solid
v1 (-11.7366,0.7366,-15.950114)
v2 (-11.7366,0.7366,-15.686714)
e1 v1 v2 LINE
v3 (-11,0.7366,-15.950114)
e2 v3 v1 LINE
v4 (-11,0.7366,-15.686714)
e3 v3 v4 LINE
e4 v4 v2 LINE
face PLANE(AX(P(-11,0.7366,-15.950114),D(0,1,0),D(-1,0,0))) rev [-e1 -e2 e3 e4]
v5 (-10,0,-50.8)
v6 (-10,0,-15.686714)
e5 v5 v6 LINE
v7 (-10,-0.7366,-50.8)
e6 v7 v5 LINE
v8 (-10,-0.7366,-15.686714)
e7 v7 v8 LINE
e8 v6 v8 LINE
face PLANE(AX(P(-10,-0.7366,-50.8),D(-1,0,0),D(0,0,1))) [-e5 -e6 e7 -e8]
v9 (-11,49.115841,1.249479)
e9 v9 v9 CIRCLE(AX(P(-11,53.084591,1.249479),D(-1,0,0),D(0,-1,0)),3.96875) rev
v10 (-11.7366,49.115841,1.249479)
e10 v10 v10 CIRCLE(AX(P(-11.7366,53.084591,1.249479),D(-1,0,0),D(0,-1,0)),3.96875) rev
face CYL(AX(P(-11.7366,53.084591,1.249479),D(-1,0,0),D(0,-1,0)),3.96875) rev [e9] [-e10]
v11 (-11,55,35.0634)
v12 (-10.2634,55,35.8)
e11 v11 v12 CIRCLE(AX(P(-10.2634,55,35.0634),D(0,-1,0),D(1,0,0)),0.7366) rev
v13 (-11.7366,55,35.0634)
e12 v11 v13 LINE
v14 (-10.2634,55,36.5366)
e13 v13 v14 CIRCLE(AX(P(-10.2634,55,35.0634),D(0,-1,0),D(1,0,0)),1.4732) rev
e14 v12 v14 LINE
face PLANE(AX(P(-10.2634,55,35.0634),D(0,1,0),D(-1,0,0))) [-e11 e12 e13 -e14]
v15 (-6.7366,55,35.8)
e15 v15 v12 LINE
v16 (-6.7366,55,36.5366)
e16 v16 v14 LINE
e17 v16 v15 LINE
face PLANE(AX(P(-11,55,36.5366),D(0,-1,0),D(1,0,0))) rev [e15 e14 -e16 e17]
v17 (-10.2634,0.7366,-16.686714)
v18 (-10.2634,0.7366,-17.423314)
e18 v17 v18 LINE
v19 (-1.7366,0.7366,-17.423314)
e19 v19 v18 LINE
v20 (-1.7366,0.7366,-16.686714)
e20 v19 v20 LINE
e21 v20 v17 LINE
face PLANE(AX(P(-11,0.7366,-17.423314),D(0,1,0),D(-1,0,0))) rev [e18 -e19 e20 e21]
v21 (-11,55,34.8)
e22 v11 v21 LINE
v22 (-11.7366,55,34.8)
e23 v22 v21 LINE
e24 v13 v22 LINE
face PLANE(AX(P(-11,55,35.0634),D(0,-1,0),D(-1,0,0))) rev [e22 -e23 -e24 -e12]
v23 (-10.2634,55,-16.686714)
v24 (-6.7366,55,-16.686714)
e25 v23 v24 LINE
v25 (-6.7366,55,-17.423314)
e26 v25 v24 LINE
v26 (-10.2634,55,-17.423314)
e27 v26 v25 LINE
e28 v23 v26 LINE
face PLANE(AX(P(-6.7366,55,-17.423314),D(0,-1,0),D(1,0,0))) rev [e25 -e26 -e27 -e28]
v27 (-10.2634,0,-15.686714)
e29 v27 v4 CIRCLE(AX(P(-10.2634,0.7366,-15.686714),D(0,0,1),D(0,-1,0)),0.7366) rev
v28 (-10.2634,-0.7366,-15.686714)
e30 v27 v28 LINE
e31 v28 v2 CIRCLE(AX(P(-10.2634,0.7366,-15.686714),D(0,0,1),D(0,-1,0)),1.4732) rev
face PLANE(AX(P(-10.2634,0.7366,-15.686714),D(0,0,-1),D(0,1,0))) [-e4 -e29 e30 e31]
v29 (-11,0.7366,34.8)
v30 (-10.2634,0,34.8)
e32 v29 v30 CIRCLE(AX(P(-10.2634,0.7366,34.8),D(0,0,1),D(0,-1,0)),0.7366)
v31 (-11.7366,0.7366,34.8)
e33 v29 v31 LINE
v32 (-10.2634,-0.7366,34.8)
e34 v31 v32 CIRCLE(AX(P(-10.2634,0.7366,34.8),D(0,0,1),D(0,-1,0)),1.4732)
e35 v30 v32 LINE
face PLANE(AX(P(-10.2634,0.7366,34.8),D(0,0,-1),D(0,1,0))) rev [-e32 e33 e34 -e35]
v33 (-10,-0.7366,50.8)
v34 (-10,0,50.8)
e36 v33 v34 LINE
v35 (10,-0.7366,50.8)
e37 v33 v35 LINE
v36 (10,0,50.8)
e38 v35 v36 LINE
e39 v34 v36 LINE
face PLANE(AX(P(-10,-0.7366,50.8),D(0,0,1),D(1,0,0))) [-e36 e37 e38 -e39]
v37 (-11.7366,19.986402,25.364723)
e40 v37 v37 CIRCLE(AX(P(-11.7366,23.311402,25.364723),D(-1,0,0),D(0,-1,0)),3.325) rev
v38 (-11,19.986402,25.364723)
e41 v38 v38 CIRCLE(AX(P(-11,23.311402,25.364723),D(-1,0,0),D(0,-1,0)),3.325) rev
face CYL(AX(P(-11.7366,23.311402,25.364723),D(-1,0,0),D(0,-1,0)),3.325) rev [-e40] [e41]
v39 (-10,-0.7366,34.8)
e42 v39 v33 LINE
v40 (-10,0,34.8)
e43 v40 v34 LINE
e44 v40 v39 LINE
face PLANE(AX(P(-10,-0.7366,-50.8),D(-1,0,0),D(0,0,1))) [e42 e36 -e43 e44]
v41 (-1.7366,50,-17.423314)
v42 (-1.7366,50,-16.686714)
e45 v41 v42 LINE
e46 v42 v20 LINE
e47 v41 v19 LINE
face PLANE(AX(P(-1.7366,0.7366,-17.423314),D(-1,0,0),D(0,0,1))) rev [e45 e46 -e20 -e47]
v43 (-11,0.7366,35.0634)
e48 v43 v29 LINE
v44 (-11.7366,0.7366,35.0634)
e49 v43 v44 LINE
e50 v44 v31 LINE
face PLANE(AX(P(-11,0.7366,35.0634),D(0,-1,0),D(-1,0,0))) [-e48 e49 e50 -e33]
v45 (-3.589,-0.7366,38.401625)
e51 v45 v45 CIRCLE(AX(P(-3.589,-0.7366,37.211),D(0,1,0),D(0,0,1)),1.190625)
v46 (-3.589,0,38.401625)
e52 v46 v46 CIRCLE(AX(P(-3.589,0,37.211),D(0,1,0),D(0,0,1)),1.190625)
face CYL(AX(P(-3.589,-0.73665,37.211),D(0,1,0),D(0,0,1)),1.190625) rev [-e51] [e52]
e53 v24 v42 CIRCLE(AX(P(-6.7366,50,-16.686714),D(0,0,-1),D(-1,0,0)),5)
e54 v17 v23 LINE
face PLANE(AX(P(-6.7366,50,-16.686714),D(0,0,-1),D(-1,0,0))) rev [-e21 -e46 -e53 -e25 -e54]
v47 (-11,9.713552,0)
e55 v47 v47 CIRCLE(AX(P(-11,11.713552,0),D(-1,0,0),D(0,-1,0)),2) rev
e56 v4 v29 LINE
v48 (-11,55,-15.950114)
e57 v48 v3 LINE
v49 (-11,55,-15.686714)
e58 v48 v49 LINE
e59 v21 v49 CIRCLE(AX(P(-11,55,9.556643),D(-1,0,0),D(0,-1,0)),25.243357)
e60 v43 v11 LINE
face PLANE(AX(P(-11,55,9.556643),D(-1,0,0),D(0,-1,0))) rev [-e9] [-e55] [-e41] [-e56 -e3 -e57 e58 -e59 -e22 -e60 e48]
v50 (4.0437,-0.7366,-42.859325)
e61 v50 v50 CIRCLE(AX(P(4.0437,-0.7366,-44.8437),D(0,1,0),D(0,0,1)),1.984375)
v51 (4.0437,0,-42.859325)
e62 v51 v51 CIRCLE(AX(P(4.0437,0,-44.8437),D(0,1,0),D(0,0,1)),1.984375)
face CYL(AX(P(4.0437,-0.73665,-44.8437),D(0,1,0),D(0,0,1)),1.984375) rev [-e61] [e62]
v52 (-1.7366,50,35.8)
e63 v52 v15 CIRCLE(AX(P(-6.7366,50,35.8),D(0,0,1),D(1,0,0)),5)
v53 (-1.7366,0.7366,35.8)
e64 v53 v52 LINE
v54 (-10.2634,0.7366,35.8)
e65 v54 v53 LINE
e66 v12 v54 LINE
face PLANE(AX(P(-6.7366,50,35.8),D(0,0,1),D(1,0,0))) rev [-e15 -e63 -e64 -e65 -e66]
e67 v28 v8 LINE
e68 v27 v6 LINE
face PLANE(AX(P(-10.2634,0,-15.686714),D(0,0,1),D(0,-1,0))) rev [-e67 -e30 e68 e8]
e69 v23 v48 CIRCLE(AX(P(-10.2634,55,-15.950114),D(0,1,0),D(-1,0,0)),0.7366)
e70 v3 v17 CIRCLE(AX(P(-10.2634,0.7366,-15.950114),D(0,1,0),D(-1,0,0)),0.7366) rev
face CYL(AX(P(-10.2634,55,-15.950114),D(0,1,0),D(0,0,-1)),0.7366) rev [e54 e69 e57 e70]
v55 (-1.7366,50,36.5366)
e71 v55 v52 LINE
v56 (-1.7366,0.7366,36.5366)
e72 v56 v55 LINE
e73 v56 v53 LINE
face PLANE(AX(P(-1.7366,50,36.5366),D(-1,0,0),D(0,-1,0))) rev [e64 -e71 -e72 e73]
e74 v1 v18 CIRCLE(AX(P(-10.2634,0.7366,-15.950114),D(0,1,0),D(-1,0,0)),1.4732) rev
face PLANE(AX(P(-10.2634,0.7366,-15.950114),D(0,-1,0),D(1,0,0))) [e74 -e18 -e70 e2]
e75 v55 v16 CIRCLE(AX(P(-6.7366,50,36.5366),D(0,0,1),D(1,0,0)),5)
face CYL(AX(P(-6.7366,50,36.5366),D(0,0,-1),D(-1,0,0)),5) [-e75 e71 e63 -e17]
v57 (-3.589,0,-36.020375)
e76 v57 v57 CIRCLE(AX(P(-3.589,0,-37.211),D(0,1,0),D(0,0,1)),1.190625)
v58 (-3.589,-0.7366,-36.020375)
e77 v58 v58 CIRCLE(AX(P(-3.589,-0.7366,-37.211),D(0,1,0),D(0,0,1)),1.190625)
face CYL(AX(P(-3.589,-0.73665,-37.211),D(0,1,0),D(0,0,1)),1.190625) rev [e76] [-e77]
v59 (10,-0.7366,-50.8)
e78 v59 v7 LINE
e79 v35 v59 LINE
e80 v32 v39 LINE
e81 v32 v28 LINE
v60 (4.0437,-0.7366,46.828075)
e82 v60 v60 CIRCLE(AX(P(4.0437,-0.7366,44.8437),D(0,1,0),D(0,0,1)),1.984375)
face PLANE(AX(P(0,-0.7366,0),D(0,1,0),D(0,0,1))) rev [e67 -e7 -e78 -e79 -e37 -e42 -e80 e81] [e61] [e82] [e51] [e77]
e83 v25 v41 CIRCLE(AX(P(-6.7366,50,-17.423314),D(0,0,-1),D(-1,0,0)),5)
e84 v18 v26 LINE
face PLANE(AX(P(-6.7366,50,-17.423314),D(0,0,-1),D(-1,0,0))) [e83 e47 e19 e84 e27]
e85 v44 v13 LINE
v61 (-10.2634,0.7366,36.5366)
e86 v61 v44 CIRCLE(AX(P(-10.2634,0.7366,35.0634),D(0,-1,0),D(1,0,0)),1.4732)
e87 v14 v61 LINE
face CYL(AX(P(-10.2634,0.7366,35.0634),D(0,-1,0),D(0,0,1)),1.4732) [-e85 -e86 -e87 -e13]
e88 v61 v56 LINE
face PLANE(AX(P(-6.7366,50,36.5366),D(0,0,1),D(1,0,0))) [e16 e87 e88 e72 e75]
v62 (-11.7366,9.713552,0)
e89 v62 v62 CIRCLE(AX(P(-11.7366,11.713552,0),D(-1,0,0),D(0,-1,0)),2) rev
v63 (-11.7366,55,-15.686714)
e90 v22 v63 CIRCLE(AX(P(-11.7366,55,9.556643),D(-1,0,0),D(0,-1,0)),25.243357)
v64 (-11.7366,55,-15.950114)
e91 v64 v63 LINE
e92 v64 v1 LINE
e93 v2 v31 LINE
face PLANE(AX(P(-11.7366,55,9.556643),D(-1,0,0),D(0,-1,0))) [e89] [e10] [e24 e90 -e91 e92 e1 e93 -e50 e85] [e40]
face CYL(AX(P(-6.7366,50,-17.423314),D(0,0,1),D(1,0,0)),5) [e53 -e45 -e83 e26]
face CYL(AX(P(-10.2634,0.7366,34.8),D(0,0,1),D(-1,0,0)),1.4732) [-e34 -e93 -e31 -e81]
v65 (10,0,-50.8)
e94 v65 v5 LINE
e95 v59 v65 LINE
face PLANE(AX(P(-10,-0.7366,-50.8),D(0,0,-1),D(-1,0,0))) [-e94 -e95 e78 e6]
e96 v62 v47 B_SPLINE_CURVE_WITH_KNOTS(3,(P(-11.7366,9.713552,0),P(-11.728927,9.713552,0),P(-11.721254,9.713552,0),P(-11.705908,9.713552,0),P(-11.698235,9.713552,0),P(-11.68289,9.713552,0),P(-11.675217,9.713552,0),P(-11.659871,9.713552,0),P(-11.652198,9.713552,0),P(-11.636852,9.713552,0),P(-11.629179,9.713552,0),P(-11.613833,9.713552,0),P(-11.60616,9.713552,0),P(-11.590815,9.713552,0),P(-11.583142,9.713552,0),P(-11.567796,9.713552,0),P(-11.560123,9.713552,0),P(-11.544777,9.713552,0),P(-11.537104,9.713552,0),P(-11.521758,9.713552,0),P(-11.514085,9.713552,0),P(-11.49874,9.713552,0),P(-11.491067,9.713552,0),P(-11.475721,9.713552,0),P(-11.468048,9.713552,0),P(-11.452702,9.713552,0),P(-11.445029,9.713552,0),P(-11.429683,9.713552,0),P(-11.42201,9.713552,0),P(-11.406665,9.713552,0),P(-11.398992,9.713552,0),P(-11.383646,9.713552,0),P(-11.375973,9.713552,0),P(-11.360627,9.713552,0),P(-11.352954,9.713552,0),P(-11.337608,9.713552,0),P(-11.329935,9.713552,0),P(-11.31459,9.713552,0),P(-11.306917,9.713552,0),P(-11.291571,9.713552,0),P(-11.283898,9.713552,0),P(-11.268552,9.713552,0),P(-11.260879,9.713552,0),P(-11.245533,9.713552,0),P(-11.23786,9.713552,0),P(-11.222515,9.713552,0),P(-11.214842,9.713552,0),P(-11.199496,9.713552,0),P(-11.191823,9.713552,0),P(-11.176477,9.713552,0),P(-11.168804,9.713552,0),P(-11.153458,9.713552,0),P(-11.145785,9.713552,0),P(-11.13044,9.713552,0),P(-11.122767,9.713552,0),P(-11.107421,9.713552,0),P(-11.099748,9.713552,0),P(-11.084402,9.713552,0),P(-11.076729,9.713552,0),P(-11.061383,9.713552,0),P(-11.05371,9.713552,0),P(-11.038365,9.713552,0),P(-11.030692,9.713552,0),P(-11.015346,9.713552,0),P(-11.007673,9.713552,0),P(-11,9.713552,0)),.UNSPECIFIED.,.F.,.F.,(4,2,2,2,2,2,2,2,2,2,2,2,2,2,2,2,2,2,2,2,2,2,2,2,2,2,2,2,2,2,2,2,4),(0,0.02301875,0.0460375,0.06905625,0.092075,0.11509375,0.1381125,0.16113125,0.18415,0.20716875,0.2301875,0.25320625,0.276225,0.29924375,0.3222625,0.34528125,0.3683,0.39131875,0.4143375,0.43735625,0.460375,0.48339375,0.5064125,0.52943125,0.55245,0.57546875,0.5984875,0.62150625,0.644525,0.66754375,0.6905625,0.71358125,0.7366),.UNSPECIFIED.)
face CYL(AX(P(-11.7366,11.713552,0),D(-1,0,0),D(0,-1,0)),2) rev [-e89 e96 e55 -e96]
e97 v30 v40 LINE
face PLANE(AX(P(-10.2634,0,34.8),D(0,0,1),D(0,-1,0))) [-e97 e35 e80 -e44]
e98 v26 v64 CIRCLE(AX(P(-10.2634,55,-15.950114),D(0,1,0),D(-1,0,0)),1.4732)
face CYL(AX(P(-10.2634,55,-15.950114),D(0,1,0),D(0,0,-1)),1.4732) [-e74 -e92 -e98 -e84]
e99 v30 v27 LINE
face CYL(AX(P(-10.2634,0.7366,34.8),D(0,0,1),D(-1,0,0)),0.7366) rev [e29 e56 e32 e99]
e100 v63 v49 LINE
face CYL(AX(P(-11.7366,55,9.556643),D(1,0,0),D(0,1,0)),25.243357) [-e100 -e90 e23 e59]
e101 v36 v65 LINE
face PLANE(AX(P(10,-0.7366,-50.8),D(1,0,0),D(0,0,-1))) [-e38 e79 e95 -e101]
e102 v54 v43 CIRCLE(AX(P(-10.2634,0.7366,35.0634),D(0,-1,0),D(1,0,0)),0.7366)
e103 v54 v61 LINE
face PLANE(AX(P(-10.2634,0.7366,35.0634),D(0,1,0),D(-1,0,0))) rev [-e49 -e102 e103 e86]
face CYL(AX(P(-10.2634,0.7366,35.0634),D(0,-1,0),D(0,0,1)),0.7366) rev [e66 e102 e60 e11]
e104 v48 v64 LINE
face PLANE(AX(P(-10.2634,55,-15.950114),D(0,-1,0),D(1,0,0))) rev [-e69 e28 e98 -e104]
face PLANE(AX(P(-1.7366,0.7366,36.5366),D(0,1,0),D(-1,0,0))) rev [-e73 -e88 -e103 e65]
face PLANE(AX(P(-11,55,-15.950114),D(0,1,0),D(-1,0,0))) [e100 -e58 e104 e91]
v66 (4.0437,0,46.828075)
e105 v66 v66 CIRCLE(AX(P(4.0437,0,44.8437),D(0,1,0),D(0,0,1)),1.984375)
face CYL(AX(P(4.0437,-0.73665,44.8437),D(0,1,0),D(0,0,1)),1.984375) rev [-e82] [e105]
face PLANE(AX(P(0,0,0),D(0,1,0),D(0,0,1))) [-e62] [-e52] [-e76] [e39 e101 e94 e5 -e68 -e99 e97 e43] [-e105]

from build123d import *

# Parameters (mm, degrees)
SKETCH1_W                 = 20
SKETCH1_H                 = 101.6
BASE_FLANGE1_DEPTH        = 0.7366
EDGE_FLANGE1_DEPTH        = 50.486713846
EDGE_FLANGE1_START        = 0.7366
EDGE_FLANGE1_FLAT_DEPTH   = 0.7366
CUT_EXTRUDE1_DEPTH        = 245.392554313
CUT_EXTRUDE1_DEPTH_BACK   = 245.392554313
SKETCH9_R                 = 2
CUT_EXTRUDE3_DEPTH        = 248.026355859
CUT_EXTRUDE3_DEPTH_BACK   = 248.026355859
SKETCH11_R                = 3.96875
CUT_EXTRUDE5_DEPTH        = 199.550344579
CUT_EXTRUDE5_DEPTH_BACK   = 199.550344579
SKETCH13_R                = 1.984375
SKETCH13_R_2              = 1.190625
EDGE_FLANGE2_DEPTH        = 54.2634
EDGE_FLANGE2_START        = 0.7366
EDGE_FLANGE2_FLAT_DEPTH   = 0.7366
EDGE_FLANGE2_BEND_DEPTH   = 54.2634
EDGE_FLANGE2_FLAT_2_DEPTH = 0.7366
CUT_EXTRUDE35_DEPTH       = 251.457429571
CUT_EXTRUDE35_DEPTH_BACK  = 251.457429571
SKETCH50_R                = 3.325000001


# Sheet-metal steps are written as plain solids
with BuildPart() as part:
    # Sketch1 → Base-Flange1 (new body)
    with BuildSketch(Plane(origin=(0, 0, 0), x_dir=(1, 0, 0), z_dir=(0, 1, 0))):
        Rectangle(SKETCH1_W, SKETCH1_H)
    extrude(amount=-BASE_FLANGE1_DEPTH)

    # Edge-Flange1 bend section (across the edge) → Edge-Flange1 (add)
    with BuildSketch(Plane(origin=(-11, 0, -15.686713846), x_dir=(1, 0, 0), z_dir=(0, 0, 1))):
        with BuildLine():
            Line((-0.7366, 0.7366), (0, 0.7366))
            ThreePointArc((0, 0.7366), (0.215745145, 0.215745145), (0.7366, 0))
            Line((0.7366, 0), (1, 0))
            Line((1, 0), (1, -0.7366))
            Line((1, -0.7366), (0.7366, -0.7366))
            ThreePointArc((0.7366, -0.7366), (-0.30510971, -0.30510971), (-0.7366, 0.7366))
        make_face()
    extrude(amount=EDGE_FLANGE1_DEPTH)

    # Edge-Flange1 profile (on flange) → Edge-Flange1 flat (add)
    with BuildSketch(Plane.ZY.offset(11).offset(EDGE_FLANGE1_START)):
        with BuildLine():
            ThreePointArc((34.8, 55), (9.556643077, 80.243356923), (-15.686713846, 55))
            Line((-15.686713846, 55), (-15.686713846, 0.7366))
            Line((-15.686713846, 0.7366), (34.8, 0.7366))
            Line((34.8, 0.7366), (34.8, 55))
        make_face()
    extrude(amount=-EDGE_FLANGE1_FLAT_DEPTH)

    # Sketch9 → Cut-Extrude1 (cut, two sides: drawn at the far end of the back side and taken through both)
    with BuildSketch(Plane(origin=(-48.111610167, -124.793980752, 68.826299478), x_dir=(0, 0, -1), z_dir=(1, 0, 0)).offset(-CUT_EXTRUDE1_DEPTH_BACK)):
        with Locations(Location((68.826299478, 136.507533033, 0), (0, 0, 270))):
            Circle(SKETCH9_R)
    extrude(amount=CUT_EXTRUDE1_DEPTH + CUT_EXTRUDE1_DEPTH_BACK, mode=Mode.SUBTRACT)

    # Sketch11 → Cut-Extrude3 (cut, two sides: drawn at the far end of the back side and taken through both)
    with BuildSketch(Plane(origin=(-58.346610167, -124.793980752, 68.826299478), x_dir=(0, 0, -1), z_dir=(1, 0, 0)).offset(-CUT_EXTRUDE3_DEPTH_BACK)):
        with Locations(Location((67.576820433, 177.878571709, 0), (0, 0, 270))):
            Circle(SKETCH11_R)
    extrude(amount=CUT_EXTRUDE3_DEPTH + CUT_EXTRUDE3_DEPTH_BACK, mode=Mode.SUBTRACT)

    # Sketch13 → Cut-Extrude5 (cut, two sides: drawn at the far end of the back side and taken through both)
    with BuildSketch(Plane(origin=(124.911822879, 0, 68.826299478), x_dir=(-0.7071067811865436, 0, 0.7071067811865515), z_dir=(0, 1, 0)).offset(-CUT_EXTRUDE5_DEPTH_BACK)):
        with Locations(Location((68.508410595, -102.424928038, 0), (0, 0, 45))):
            Circle(SKETCH13_R)
        with Locations(Location((68.508410595, -113.219195896, 0), (0, 0, 45))):
            Circle(SKETCH13_R_2)
        with Locations(Location((5.089841868, -165.843496765, 0), (0, 0, 45))):
            Circle(SKETCH13_R)
        with Locations(Location((15.884109726, -165.843496765, 0), (0, 0, 45))):
            Circle(SKETCH13_R_2)
    extrude(amount=CUT_EXTRUDE5_DEPTH + CUT_EXTRUDE5_DEPTH_BACK, mode=Mode.SUBTRACT)

    # Edge-Flange2 bend section (across the edge) → Edge-Flange2 (add)
    with BuildSketch(Plane(origin=(-11, 0.7366, -16.686713846), x_dir=(0, 0, 1), z_dir=(0, 1, 0))):
        with BuildLine():
            Line((-0.7366, 0.7366), (0, 0.7366))
            ThreePointArc((0, 0.7366), (0.215745145, 0.215745145), (0.7366, 0))
            Line((0.7366, 0), (1, 0))
            Line((1, 0), (1, -0.7366))
            Line((1, -0.7366), (0.7366, -0.7366))
            ThreePointArc((0.7366, -0.7366), (-0.30510971, -0.30510971), (-0.7366, 0.7366))
        make_face()
    extrude(amount=EDGE_FLANGE2_DEPTH)

    # Edge-Flange2 profile (on flange) → Edge-Flange2 flat (add)
    with BuildSketch(Plane(origin=(-11, 0, -16.686713846), x_dir=(0, 1, 0), z_dir=(0, 0, -1)).offset(EDGE_FLANGE2_START)):
        with BuildLine():
            Line((50, 9.2634), (0.7366, 9.2634))
            Line((0.7366, 9.2634), (0.7366, 0.7366))
            Line((0.7366, 0.7366), (55, 0.7366))
            Line((55, 0.7366), (55, 4.2634))
            ThreePointArc((55, 4.2634), (53.535533906, 7.798933906), (50, 9.2634))
        make_face()
    extrude(amount=-EDGE_FLANGE2_FLAT_DEPTH)

    # Edge-Flange2 bend section 2 (across the edge) → Edge-Flange2 bend (add)
    with BuildSketch(Plane(origin=(-11, 55, 35.8), x_dir=(0, 0, -1), z_dir=(0, -1, 0))):
        with BuildLine():
            Line((-0.7366, 0.7366), (0, 0.7366))
            ThreePointArc((0, 0.7366), (0.215745145, 0.215745145), (0.7366, 0))
            Line((0.7366, 0), (1, 0))
            Line((1, 0), (1, -0.7366))
            Line((1, -0.7366), (0.7366, -0.7366))
            ThreePointArc((0.7366, -0.7366), (-0.30510971, -0.30510971), (-0.7366, 0.7366))
        make_face()
    extrude(amount=EDGE_FLANGE2_BEND_DEPTH)

    # Edge-Flange2 profile 2 (on flange) → Edge-Flange2 flat 2 (add)
    with BuildSketch(Plane(origin=(-11, 0, 35.8), x_dir=(0, -1, 0), z_dir=(0, 0, 1)).offset(EDGE_FLANGE2_START)):
        with BuildLine():
            ThreePointArc((-50, 9.2634), (-53.535533906, 7.798933906), (-55, 4.2634))
            Line((-55, 4.2634), (-55, 0.7366))
            Line((-55, 0.7366), (-0.7366, 0.7366))
            Line((-0.7366, 0.7366), (-0.7366, 9.2634))
            Line((-0.7366, 9.2634), (-50, 9.2634))
        make_face()
    extrude(amount=-EDGE_FLANGE2_FLAT_2_DEPTH)

    # Sketch50 → Cut-Extrude35 (cut, two sides: drawn at the far end of the back side and taken through both)
    with BuildSketch(Plane(origin=(-69.8634, -124.793980752, 68.826299478), x_dir=(0, 0, -1), z_dir=(1, 0, 0)).offset(-CUT_EXTRUDE35_DEPTH_BACK)):
        with Locations(Location((43.461576529, 148.105383059, 0), (0, 0, 270))):
            Circle(SKETCH50_R)
    extrude(amount=CUT_EXTRUDE35_DEPTH + CUT_EXTRUDE35_DEPTH_BACK, mode=Mode.SUBTRACT)


solid = part.part
